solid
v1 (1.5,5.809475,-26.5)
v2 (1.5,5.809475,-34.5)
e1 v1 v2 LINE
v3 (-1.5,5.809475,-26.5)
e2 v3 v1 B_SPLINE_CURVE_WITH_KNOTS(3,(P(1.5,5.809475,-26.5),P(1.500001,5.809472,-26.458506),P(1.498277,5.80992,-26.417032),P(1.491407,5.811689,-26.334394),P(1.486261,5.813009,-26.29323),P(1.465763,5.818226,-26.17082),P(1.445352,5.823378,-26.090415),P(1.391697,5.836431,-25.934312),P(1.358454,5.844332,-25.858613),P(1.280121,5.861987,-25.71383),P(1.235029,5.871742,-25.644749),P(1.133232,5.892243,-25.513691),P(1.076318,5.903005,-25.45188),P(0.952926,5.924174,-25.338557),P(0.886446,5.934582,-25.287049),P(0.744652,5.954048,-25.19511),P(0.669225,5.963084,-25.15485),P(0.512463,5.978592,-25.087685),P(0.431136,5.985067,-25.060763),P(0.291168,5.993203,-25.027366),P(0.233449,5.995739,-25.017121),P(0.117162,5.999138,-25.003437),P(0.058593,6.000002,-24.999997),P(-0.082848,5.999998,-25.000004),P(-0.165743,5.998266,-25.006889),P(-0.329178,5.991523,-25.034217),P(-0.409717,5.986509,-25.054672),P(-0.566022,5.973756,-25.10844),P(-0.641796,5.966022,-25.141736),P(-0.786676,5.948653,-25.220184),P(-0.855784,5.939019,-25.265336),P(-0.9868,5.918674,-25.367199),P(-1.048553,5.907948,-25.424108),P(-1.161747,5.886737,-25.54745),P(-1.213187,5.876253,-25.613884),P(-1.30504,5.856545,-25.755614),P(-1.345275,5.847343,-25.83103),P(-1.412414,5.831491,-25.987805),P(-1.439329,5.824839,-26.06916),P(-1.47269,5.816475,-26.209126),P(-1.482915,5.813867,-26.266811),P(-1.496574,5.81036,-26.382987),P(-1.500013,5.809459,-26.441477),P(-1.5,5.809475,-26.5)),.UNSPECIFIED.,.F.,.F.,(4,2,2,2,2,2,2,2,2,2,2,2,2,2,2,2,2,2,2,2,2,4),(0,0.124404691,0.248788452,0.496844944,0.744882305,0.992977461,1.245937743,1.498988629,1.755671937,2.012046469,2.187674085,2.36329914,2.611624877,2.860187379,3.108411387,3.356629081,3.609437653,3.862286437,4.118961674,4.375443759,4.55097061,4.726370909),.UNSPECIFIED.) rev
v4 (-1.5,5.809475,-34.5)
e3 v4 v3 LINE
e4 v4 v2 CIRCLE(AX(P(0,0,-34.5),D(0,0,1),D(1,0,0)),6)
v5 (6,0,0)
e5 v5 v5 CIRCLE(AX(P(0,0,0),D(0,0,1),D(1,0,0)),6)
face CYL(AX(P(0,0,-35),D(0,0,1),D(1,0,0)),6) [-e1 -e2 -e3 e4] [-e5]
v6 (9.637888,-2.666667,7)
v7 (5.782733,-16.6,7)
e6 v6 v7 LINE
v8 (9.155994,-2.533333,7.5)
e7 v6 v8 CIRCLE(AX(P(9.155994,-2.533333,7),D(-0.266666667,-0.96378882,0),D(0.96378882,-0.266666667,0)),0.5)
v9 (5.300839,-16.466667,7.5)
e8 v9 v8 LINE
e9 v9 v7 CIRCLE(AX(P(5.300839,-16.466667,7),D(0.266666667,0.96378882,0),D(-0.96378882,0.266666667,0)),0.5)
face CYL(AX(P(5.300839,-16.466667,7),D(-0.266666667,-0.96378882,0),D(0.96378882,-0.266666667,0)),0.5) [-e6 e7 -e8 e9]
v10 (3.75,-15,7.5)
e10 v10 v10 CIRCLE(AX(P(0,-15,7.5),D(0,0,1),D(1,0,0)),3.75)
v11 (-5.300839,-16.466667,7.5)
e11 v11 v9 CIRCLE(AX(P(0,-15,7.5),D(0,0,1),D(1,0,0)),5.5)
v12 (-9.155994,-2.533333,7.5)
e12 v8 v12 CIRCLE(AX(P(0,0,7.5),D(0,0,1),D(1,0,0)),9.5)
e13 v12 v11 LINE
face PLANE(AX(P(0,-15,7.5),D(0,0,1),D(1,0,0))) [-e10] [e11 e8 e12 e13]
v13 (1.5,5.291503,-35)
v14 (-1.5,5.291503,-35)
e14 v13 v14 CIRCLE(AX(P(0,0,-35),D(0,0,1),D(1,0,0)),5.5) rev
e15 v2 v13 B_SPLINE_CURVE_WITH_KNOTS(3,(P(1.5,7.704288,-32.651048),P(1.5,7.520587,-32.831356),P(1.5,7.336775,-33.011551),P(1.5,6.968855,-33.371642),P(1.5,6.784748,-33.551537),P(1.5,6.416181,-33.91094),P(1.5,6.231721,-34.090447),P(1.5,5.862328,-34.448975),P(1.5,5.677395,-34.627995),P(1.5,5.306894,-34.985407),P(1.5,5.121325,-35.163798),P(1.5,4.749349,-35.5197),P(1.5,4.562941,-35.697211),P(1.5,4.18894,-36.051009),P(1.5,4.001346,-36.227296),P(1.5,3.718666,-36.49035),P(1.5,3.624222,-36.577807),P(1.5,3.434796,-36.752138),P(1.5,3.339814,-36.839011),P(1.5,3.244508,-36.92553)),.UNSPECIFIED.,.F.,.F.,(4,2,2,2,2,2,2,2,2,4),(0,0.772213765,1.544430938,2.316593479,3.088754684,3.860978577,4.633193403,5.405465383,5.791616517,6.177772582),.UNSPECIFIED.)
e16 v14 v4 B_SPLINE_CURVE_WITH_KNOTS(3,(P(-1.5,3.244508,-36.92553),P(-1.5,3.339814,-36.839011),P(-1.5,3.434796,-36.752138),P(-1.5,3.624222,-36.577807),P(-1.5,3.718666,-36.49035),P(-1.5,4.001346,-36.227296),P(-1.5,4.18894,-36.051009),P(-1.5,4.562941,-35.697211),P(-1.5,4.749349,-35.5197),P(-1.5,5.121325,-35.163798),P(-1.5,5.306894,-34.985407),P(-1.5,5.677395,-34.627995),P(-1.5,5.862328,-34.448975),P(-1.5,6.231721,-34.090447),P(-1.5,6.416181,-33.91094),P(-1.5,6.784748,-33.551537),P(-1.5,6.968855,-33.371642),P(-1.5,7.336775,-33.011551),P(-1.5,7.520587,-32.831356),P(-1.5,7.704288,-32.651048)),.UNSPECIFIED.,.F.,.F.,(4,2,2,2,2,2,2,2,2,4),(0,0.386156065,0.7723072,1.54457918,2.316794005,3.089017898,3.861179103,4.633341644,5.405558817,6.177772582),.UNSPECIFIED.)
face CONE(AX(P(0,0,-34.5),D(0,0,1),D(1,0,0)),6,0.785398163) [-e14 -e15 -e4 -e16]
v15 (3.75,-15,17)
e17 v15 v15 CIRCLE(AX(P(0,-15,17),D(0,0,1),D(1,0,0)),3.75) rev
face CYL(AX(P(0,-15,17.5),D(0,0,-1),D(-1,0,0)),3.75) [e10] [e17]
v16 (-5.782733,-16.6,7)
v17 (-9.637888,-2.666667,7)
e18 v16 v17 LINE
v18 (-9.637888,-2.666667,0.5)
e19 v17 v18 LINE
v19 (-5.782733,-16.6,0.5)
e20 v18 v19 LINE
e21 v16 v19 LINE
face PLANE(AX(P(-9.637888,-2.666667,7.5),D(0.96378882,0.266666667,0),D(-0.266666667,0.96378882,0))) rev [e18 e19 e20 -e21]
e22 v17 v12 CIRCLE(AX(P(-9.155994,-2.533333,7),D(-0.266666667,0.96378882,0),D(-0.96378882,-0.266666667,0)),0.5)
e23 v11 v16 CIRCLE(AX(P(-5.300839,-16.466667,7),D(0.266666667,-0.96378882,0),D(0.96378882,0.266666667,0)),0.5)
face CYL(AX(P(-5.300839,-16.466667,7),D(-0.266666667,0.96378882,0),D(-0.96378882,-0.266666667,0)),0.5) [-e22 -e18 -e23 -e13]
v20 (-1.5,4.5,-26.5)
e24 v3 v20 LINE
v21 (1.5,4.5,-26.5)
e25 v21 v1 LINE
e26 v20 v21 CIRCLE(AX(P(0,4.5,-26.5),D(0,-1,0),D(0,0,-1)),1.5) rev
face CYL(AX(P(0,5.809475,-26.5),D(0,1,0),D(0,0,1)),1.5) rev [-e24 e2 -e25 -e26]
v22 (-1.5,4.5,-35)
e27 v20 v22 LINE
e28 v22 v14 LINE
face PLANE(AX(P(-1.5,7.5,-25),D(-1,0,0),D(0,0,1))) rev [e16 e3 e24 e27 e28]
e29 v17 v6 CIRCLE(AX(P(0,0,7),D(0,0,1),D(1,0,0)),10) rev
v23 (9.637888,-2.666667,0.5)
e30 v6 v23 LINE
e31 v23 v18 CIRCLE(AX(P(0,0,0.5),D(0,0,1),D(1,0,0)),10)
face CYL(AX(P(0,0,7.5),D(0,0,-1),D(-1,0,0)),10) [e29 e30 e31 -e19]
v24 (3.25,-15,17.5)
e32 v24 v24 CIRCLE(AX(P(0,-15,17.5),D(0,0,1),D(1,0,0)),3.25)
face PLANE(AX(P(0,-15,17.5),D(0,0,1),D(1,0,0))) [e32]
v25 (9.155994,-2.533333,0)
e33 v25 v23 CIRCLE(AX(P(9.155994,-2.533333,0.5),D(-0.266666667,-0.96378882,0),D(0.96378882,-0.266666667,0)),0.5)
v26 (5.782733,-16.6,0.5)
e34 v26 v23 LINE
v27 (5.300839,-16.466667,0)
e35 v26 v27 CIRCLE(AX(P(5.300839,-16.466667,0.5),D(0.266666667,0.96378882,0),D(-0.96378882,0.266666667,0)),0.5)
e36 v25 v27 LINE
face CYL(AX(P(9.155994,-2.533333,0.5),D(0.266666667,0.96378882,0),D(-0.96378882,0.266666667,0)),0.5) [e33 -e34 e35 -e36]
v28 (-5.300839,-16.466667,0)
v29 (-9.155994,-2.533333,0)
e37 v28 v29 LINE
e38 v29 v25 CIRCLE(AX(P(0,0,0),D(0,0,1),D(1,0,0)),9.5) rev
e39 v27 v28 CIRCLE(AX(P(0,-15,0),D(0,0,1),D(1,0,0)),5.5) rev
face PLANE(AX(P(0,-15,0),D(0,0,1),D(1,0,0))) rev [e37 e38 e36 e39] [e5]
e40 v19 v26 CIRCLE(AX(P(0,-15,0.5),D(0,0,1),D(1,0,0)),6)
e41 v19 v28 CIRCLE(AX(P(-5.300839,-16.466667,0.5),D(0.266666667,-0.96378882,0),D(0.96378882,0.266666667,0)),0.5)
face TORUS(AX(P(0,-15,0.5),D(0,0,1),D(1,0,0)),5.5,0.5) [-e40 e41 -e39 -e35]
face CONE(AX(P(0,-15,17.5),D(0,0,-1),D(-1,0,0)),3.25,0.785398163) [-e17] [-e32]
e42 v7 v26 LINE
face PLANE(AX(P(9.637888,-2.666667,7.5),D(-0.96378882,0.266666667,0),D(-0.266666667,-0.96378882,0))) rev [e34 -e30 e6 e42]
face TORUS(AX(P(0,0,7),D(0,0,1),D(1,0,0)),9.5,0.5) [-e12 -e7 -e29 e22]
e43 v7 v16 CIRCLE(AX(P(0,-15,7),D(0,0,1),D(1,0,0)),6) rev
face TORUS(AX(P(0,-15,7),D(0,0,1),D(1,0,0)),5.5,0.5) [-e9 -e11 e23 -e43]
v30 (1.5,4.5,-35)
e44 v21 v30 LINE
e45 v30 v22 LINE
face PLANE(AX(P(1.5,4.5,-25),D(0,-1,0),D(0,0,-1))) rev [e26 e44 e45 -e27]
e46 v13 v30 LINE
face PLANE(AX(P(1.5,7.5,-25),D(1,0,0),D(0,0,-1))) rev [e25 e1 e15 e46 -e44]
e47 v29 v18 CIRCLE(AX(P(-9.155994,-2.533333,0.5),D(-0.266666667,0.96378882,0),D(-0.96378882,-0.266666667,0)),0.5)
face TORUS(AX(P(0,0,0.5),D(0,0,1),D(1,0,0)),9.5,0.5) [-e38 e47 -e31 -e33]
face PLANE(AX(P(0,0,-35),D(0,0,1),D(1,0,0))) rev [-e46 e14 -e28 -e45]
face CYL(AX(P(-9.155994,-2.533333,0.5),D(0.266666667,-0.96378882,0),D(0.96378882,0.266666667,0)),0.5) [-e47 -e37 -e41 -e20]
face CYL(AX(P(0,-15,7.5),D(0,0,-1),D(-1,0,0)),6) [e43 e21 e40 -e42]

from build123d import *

# Parameters (mm, degrees)
SKETCH_1_R          = 6
EXTRUDE_1_DEPTH     = 35
EXTRUDE_2_DEPTH     = 7.5
SKETCH_3_R          = 3.75
EXTRUDE_3_DEPTH     = 10
CHAMFER_1_SIZE      = 0.5
CHAMFER_2_SIZE      = 0.5
SKETCH_5_W          = 3
SKETCH_5_H          = 3
CUT_EXTRUDE_1_DEPTH = 10
FILLET_1_R          = 1.5
FILLET_2_R          = 0.5


with BuildPart() as part:
    # 草图1 → 凸台-拉伸1 (new body)
    with BuildSketch(Plane.XY):
        Circle(SKETCH_1_R)
    extrude(amount=-EXTRUDE_1_DEPTH)

    # 草图2 → 凸台-拉伸2 (add)
    with BuildSketch(Plane.XY):
        with BuildLine():
            Line((9.637888197, -2.666666667), (5.782732918, -16.6))
            ThreePointArc((5.782732918, -16.6), (0, -21), (-5.782732918, -16.6))
            Line((-5.782732918, -16.6), (-9.637888197, -2.666666667))
            ThreePointArc((-9.637888197, -2.666666667), (0, 10), (9.637888197, -2.666666667))
        make_face()
    extrude(amount=EXTRUDE_2_DEPTH)

    # 草图3 → 凸台-拉伸3 (add)
    with BuildSketch(Plane.XY.offset(7.5)):
        with Locations((0, -15)):
            Circle(SKETCH_3_R)
    extrude(amount=EXTRUDE_3_DEPTH)

    # 倒角1
    chamfer_1_edges = [part.edges().sort_by_distance(p)[0] for p in [
        (-3.75, -15, 17.5),
    ]]
    chamfer(chamfer_1_edges, length=CHAMFER_1_SIZE)

    # 倒角2
    chamfer_2_edges = [part.edges().sort_by_distance(p)[0] for p in [
        (-6, 0, -35),
    ]]
    chamfer(chamfer_2_edges, length=CHAMFER_2_SIZE)

    # 草图5 → 切除-拉伸1 (cut)
    with BuildSketch(Plane(origin=(0, 0, -35), x_dir=(-1, 0, 0), z_dir=(0, 0, -1))):
        with Locations((0, 6)):
            Rectangle(SKETCH_5_W, SKETCH_5_H)
    extrude(amount=-CUT_EXTRUDE_1_DEPTH, mode=Mode.SUBTRACT)

    # 圆角1
    fillet_1_edges = [part.edges().sort_by_distance(p)[0] for p in [
        (-1.5, 5.15473751, -25),
        (1.5, 5.15473751, -25),
    ]]
    fillet(fillet_1_edges, radius=FILLET_1_R - 0.0001)  # a hair under: the kernel refuses the full size

    # 圆角2
    fillet_2_edges = [part.edges().sort_by_distance(p)[0] for p in [
        (0, -21, 0),
        (7.710310557, -9.633333333, 0),
        (0, 10, 0),
        (-7.710310557, -9.633333333, 0),
        (0, -21, 7.5),
        (7.710310557, -9.633333333, 7.5),
        (0, 10, 7.5),
        (-7.710310557, -9.633333333, 7.5),
    ]]
    fillet(fillet_2_edges, radius=FILLET_2_R)


solid = part.part
